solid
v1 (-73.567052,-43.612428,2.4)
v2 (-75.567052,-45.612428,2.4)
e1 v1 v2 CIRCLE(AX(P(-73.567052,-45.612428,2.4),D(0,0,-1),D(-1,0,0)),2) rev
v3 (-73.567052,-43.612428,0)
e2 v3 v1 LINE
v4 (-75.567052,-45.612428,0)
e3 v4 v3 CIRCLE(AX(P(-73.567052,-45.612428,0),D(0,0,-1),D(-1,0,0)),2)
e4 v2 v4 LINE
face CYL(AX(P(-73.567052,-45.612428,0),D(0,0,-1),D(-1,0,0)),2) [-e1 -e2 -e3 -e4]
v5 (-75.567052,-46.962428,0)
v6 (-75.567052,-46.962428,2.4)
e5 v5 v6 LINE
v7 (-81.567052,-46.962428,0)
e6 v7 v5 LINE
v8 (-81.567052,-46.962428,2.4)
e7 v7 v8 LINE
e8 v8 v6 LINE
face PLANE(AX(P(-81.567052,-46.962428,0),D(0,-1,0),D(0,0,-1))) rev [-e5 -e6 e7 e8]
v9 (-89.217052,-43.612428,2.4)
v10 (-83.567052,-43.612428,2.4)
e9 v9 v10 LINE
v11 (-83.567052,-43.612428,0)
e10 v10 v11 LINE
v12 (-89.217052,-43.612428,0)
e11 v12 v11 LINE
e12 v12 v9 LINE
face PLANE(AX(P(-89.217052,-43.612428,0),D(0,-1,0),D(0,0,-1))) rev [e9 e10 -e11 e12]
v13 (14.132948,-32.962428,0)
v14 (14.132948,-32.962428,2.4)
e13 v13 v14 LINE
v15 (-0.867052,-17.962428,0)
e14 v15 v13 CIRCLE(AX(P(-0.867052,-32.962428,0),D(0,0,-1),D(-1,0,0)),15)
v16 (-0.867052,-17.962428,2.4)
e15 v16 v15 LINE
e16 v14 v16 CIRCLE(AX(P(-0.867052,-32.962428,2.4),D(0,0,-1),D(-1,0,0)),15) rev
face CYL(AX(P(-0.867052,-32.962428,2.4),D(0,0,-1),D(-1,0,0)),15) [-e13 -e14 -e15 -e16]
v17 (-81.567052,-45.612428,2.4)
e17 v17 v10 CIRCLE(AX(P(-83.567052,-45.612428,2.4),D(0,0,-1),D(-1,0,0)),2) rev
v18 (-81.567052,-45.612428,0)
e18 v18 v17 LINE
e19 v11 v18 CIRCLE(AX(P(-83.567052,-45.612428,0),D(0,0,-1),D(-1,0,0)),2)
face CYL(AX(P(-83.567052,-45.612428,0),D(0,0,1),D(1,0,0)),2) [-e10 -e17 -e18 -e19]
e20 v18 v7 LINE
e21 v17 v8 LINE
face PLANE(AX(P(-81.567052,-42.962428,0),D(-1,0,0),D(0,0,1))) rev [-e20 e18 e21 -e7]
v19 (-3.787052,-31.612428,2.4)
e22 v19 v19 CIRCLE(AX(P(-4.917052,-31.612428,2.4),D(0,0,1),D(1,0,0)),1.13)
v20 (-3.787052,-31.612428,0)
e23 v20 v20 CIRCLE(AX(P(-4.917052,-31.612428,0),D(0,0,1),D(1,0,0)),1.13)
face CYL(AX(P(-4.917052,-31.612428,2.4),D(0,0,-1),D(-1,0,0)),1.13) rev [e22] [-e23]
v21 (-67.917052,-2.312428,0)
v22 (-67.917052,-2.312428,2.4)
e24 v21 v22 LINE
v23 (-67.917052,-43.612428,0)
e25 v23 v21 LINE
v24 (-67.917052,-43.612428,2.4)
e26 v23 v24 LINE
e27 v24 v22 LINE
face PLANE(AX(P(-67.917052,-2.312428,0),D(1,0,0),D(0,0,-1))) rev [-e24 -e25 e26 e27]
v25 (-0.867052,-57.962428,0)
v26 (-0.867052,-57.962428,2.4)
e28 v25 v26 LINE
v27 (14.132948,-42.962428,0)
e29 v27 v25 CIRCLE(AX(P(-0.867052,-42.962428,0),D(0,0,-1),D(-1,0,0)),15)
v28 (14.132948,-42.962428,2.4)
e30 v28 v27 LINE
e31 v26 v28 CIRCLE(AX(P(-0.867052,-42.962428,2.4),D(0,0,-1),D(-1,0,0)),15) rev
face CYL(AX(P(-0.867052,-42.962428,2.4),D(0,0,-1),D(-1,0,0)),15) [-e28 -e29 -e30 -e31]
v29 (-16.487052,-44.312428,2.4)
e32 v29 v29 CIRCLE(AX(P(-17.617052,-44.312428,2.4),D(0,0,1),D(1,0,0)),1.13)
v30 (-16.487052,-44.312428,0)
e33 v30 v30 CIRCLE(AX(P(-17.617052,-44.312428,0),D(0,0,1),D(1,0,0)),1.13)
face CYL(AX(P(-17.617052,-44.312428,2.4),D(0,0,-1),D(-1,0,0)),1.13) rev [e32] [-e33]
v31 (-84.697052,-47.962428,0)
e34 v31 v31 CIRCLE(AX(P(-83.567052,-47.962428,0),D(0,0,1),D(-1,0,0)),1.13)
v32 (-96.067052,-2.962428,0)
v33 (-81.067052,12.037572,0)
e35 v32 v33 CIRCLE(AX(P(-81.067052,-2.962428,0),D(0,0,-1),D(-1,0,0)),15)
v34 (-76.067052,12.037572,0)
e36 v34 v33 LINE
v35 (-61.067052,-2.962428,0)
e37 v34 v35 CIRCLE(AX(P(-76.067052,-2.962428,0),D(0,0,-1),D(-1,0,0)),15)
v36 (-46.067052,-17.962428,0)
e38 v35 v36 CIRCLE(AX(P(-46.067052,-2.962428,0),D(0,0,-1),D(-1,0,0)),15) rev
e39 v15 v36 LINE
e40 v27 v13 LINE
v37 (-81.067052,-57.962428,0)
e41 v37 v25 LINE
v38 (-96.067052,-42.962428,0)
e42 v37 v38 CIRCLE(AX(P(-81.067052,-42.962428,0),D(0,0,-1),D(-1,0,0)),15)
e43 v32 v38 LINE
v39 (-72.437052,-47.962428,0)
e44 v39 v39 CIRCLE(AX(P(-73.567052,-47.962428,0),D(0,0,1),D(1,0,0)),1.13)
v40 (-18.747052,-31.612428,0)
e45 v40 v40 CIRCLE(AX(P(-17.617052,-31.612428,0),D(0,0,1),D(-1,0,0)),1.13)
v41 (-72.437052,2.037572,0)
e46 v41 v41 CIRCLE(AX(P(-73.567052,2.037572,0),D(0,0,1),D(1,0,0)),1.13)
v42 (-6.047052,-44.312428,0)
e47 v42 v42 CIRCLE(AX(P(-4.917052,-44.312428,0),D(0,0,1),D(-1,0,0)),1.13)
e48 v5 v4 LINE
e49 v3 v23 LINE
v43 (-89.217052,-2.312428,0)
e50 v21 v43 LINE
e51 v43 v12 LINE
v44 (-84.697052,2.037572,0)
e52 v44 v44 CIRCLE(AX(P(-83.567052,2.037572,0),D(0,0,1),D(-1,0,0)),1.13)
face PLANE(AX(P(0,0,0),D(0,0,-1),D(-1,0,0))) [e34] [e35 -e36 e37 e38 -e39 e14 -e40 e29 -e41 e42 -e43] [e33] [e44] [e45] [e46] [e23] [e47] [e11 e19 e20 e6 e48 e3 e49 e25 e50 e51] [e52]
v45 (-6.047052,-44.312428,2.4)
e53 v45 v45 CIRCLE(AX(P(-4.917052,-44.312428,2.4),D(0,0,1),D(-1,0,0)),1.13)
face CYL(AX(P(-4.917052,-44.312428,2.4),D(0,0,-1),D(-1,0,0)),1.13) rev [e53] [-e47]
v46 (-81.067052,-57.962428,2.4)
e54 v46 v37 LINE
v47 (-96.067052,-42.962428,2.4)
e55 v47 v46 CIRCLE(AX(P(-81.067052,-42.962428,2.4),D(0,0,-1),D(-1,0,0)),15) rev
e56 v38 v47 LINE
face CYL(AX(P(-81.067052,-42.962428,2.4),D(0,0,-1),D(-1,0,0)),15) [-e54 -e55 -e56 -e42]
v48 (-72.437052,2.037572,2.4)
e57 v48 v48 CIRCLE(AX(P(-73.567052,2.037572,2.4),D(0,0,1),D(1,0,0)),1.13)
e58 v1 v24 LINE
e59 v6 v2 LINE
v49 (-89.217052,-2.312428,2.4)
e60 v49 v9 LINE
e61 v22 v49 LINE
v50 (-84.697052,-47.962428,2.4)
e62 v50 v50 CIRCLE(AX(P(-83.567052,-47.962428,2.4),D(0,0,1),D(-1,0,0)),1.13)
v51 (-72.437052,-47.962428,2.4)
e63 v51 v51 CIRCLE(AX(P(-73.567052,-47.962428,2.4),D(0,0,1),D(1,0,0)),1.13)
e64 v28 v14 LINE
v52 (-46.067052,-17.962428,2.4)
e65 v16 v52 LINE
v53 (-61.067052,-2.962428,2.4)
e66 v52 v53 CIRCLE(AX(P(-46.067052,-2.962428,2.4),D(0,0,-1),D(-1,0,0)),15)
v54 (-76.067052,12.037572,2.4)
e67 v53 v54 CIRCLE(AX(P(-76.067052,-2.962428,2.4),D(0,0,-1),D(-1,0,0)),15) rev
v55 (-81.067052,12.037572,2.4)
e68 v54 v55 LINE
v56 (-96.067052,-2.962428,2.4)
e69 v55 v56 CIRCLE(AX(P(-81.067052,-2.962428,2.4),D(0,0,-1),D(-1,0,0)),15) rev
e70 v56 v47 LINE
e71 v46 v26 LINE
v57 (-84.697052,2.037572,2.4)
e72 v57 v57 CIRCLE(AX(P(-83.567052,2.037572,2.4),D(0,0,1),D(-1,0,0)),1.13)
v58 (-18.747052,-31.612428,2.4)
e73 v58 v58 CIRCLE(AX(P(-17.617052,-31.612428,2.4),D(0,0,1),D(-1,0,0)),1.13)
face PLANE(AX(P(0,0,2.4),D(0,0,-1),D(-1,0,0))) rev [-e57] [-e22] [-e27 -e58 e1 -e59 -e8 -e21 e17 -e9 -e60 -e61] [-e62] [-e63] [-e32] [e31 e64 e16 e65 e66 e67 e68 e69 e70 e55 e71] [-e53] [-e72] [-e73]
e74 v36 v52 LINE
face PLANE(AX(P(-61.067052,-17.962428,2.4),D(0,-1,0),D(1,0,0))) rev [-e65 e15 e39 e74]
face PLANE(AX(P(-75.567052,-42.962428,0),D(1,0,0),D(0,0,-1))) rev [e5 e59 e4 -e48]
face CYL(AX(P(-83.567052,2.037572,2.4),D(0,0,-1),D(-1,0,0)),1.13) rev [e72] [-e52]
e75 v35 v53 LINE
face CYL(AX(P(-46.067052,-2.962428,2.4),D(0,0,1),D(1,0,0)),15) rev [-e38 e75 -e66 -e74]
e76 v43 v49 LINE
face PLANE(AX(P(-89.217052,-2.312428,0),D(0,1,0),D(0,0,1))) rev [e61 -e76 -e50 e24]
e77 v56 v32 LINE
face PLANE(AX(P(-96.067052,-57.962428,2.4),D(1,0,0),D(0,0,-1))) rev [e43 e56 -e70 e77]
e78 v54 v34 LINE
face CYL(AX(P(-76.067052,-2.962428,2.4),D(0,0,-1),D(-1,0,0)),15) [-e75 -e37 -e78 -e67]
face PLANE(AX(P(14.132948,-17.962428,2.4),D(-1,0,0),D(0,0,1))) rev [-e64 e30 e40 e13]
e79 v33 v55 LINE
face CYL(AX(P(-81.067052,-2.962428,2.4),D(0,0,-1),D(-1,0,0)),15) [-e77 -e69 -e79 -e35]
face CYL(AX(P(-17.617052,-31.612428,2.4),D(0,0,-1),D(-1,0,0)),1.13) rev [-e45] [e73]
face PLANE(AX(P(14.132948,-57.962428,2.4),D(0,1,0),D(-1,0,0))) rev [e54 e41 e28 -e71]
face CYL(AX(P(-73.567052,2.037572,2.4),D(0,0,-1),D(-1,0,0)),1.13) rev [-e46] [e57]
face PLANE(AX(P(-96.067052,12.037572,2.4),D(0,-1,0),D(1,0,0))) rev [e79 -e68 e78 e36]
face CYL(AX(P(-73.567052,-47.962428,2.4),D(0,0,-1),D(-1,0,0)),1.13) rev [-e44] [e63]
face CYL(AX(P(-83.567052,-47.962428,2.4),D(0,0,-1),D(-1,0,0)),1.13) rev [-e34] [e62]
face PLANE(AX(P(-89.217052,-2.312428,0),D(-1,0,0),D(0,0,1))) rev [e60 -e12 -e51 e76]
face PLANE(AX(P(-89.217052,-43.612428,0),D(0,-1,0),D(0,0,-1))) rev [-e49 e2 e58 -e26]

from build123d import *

# Parameters (mm, degrees)
SKETCH1_R           = 1.13
SKETCH1_W           = 20
SKETCH1_H           = 40
BOSS_EXTRUDE1_DEPTH = 2.4
SKETCH2_W           = 6
SKETCH2_H           = 4
CUT_EXTRUDE1_DEPTH  = 2.4
SKETCH3_W           = 21.3
SKETCH3_H           = 41.3
SKETCH3_W_2         = 20
SKETCH3_H_2         = 40
CUT_EXTRUDE2_DEPTH  = 2.4
FILLET1_R           = 2
FILLET2_R           = 15


with BuildPart() as part:
    # Sketch1 → Boss-Extrude1 (new body)
    with BuildSketch(Plane.XY):
        Polygon((-96.067052023, 12.037572254), (-61.067052023, 12.037572254), (-61.067052023, -17.962427746), (14.132947977, -17.962427746), (14.132947977, -57.962427746), (-96.067052023, -57.962427746), align=None)
        with Locations((-4.917052023, -31.612427746)):
            Circle(SKETCH1_R, mode=Mode.SUBTRACT)
        with Locations(Location((-17.617052023, -31.612427746, 0), (0, 0, 180))):
            Circle(SKETCH1_R, mode=Mode.SUBTRACT)
        with Locations((-17.617052023, -44.312427746)):
            Circle(SKETCH1_R, mode=Mode.SUBTRACT)
        with Locations(Location((-4.917052023, -44.312427746, 0), (0, 0, 180))):
            Circle(SKETCH1_R, mode=Mode.SUBTRACT)
        with Locations((-73.567052023, 2.037572254)):
            Circle(SKETCH1_R, mode=Mode.SUBTRACT)
        with Locations((-73.567052023, -47.962427746)):
            Circle(SKETCH1_R, mode=Mode.SUBTRACT)
        with Locations(Location((-83.567052023, 2.037572254, 0), (0, 0, 180))):
            Circle(SKETCH1_R, mode=Mode.SUBTRACT)
        with Locations(Location((-83.567052023, -47.962427746, 0), (0, 0, 180))):
            Circle(SKETCH1_R, mode=Mode.SUBTRACT)
        with Locations((-78.567052023, -22.962427746)):
            Rectangle(SKETCH1_W, SKETCH1_H, mode=Mode.SUBTRACT)
    extrude(amount=BOSS_EXTRUDE1_DEPTH)

    # Sketch2 → Cut-Extrude1 (cut)
    with BuildSketch(Plane.XY.offset(2.4)):
        with Locations((-78.567052023, -44.962427746)):
            Rectangle(SKETCH2_W, SKETCH2_H)
    extrude(amount=-CUT_EXTRUDE1_DEPTH, mode=Mode.SUBTRACT)

    # Sketch3 → Cut-Extrude2 (cut)
    with BuildSketch(Plane.XY.offset(2.4)):
        with Locations((-78.567052023, -22.962427746)):
            Rectangle(SKETCH3_W, SKETCH3_H)
        with Locations((-78.567052023, -22.962427746)):
            Rectangle(SKETCH3_W_2, SKETCH3_H_2, mode=Mode.SUBTRACT)
    extrude(amount=-CUT_EXTRUDE2_DEPTH, mode=Mode.SUBTRACT)

    # Fillet1
    fillet1_edges = [part.edges().sort_by_distance(p)[0] for p in [
        (-75.567052023, -43.612427746, 1.2),
        (-81.567052023, -43.612427746, 1.2),
    ]]
    fillet(fillet1_edges, radius=FILLET1_R)

    # Fillet2
    fillet2_edges = [part.edges().sort_by_distance(p)[0] for p in [
        (-61.067052023, -17.962427746, 1.2),
        (14.132947977, -17.962427746, 1.2),
        (14.132947977, -57.962427746, 1.2),
        (-96.067052023, -57.962427746, 1.2),
        (-61.067052023, 12.037572254, 1.2),
        (-96.067052023, 12.037572254, 1.2),
    ]]
    fillet(fillet2_edges, radius=FILLET2_R - 0.0001)  # a hair under: the kernel refuses the full size


solid = part.part
